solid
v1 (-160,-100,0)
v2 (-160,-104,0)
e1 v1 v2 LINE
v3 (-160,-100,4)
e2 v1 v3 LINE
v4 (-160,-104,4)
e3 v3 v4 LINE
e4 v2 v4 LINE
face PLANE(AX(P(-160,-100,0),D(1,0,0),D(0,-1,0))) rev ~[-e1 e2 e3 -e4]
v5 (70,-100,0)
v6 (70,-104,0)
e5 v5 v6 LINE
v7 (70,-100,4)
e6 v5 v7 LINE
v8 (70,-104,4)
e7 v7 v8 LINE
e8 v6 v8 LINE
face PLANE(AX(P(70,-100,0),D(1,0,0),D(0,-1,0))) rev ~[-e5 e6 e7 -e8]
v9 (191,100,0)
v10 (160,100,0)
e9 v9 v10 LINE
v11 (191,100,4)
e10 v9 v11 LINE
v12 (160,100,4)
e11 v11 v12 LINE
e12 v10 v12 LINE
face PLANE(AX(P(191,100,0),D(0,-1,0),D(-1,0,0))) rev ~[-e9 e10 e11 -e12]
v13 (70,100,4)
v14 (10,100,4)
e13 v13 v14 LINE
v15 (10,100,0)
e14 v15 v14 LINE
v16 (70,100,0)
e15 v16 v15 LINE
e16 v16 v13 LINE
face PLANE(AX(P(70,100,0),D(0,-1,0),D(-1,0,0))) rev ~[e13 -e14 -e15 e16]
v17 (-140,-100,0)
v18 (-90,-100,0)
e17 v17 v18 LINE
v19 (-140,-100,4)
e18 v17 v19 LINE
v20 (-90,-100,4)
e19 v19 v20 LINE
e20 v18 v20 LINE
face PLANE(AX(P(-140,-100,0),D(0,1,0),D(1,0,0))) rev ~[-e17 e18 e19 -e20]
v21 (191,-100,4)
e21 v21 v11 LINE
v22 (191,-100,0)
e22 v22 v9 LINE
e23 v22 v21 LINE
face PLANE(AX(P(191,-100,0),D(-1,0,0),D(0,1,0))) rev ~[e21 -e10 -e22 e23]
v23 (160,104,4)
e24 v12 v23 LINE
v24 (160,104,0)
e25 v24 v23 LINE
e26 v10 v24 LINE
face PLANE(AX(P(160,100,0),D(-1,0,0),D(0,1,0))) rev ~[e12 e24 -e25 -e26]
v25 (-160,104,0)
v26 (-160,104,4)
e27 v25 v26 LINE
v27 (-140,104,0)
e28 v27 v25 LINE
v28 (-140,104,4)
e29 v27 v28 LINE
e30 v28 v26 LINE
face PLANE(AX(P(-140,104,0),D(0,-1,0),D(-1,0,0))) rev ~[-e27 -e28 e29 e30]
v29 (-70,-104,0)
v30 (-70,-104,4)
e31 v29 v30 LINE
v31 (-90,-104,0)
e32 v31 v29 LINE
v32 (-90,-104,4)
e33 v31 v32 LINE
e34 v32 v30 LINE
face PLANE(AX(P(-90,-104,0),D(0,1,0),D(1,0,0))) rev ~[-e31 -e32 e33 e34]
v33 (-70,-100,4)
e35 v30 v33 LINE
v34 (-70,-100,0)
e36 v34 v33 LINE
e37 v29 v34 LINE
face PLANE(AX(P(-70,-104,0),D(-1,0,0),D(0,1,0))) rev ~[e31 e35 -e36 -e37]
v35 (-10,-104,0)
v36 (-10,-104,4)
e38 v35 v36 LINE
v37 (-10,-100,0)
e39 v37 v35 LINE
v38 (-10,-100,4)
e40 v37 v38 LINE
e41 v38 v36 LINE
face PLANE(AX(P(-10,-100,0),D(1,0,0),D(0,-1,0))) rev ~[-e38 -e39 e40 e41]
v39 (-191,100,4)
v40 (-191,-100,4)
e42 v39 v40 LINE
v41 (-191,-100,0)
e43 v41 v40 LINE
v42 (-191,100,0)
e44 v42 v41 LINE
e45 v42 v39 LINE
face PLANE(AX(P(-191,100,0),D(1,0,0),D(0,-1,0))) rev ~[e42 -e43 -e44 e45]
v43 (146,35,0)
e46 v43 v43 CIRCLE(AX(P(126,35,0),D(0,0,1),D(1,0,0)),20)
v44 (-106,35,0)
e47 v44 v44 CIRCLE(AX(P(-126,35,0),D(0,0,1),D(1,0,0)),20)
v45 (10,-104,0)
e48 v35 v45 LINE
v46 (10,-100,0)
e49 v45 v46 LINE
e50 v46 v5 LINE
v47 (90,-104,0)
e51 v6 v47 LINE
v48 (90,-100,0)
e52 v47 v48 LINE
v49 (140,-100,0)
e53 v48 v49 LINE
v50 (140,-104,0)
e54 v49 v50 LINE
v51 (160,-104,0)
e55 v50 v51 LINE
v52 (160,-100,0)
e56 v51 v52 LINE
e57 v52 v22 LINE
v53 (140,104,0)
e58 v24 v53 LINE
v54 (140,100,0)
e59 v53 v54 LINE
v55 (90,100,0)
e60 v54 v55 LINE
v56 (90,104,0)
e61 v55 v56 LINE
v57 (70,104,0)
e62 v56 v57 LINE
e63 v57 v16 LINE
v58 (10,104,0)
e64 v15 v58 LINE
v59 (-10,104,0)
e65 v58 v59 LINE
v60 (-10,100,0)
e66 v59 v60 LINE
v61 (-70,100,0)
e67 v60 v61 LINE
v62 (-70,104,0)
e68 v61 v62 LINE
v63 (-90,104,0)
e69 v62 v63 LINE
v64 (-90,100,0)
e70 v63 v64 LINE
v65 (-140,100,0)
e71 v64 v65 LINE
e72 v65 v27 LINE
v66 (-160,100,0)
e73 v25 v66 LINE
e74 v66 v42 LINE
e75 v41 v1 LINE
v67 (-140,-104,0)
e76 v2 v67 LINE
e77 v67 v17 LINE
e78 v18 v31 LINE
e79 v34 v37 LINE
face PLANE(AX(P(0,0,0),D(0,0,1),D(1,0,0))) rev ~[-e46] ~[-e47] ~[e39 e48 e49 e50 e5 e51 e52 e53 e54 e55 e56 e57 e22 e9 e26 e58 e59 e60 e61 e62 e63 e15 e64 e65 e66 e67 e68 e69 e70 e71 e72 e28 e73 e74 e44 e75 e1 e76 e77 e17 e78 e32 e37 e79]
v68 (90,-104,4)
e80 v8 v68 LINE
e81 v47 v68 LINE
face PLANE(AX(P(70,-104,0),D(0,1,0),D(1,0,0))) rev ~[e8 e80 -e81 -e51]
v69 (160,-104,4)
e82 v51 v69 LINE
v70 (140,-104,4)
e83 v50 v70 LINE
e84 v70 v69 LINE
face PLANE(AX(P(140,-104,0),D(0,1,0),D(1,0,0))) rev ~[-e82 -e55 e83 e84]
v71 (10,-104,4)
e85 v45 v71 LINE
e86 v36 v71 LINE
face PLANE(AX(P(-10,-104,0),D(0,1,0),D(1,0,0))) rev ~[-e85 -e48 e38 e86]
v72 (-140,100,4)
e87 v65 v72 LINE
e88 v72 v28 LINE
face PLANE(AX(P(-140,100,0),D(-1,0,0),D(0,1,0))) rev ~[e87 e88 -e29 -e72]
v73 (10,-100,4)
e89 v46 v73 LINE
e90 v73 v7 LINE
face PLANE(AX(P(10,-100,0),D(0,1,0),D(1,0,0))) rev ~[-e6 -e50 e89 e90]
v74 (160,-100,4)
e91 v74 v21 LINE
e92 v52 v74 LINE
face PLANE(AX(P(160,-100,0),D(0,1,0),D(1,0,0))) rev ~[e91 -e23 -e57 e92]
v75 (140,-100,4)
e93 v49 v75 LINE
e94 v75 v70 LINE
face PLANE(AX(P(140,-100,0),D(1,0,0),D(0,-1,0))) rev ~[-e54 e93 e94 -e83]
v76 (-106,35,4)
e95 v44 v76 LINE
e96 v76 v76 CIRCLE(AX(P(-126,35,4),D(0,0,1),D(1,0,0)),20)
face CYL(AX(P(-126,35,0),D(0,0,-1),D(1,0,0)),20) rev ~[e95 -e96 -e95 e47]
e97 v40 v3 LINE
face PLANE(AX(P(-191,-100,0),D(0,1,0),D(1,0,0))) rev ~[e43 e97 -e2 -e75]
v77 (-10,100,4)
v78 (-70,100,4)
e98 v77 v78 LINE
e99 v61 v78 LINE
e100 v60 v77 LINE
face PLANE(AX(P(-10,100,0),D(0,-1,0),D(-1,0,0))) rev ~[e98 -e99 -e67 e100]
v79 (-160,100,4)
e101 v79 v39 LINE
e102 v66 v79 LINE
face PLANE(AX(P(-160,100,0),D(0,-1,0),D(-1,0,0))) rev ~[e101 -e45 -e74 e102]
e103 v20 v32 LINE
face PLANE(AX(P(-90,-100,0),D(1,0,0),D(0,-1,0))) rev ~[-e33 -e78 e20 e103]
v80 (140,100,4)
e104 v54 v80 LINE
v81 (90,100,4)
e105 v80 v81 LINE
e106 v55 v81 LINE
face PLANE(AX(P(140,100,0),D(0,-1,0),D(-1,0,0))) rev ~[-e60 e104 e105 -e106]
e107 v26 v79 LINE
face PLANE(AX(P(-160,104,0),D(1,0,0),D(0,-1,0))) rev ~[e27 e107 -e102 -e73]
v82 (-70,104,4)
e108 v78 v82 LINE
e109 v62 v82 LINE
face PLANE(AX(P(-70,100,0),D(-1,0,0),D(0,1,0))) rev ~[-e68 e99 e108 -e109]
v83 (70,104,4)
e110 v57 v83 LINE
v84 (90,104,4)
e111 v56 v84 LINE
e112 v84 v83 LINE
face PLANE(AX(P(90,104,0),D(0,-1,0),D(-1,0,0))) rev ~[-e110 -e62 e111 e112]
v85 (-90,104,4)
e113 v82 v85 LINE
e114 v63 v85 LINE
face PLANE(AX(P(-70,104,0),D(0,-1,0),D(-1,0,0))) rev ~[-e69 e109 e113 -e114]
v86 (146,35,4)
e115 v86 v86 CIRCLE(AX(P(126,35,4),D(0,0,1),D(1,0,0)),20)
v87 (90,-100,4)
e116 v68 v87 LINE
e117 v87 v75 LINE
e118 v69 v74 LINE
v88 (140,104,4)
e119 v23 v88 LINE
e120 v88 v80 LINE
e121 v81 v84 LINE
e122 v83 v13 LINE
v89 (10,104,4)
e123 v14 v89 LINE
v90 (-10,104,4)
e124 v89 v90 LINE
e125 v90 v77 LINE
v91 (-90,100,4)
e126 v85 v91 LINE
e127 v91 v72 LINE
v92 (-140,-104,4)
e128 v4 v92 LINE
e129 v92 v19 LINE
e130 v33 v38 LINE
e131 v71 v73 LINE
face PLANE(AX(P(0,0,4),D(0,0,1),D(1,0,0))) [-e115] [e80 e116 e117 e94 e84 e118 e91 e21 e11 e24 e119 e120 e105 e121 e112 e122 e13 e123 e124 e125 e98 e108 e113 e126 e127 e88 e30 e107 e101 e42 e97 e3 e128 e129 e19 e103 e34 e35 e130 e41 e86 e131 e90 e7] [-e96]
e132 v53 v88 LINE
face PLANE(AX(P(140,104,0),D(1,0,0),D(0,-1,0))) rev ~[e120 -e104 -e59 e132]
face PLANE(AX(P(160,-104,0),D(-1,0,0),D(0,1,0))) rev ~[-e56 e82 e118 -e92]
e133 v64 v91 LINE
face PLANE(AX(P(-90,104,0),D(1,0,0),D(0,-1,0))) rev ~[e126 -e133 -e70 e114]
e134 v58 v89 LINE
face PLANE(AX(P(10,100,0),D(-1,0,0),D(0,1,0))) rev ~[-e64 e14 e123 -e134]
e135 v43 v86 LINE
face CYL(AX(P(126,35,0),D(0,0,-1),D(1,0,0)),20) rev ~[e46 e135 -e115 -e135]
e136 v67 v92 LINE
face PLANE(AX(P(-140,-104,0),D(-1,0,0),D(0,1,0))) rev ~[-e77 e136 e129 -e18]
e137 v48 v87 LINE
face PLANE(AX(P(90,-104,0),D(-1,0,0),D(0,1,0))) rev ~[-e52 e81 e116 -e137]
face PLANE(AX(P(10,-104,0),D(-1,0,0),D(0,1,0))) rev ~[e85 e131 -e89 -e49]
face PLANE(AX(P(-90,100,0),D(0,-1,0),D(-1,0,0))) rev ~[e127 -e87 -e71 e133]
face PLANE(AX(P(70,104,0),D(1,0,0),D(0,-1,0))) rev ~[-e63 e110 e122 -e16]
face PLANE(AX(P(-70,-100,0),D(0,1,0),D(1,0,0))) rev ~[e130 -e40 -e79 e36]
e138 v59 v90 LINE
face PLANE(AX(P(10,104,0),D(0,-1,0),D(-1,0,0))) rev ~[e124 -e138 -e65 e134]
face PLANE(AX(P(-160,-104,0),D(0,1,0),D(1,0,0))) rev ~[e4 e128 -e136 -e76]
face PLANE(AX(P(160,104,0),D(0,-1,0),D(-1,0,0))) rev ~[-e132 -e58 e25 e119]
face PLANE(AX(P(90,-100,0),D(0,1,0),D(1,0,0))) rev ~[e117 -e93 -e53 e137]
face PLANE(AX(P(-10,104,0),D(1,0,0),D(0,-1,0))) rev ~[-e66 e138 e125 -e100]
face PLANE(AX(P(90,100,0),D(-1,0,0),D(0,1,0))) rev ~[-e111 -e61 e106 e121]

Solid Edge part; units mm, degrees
sketch "Sketch1" plane through (0, 0, 0) normal (0, 0, 1) x (1, 0, 0)
  line L0 (-160, 104) -> (-160, 100)
  line L1 (-160, 100) -> (-191, 100)
  line L2 (-191, 100) -> (-191, -100)
  line L3 (-191, -100) -> (-160, -100)
  line L4 (-160, -100) -> (-160, -104)
  line L5 (-160, -104) -> (-140, -104)
  line L6 (-140, -104) -> (-140, -100)
  line L7 (-140, -100) -> (-90, -100)
  line L8 (-90, -100) -> (-90, -104)
  line L9 (-90, -104) -> (-70, -104)
  line L10 (-70, -104) -> (-70, -100)
  line L11 (-70, -100) -> (-10, -100)
  line L12 (-10, -100) -> (-10, -104)
  line L13 (-10, -104) -> (10, -104)
  line L14 (10, -104) -> (10, -100)
  line L15 (10, -100) -> (70, -100)
  line L16 (70, -100) -> (70, -104)
  line L17 (70, -104) -> (90, -104)
  line L18 (90, -104) -> (90, -100)
  line L19 (90, -100) -> (140, -100)
  line L20 (140, -100) -> (140, -104)
  line L21 (140, -104) -> (160, -104)
  line L22 (160, -104) -> (160, -100)
  line L23 (160, -100) -> (191, -100)
  line L24 (191, -100) -> (191, 100)
  line L25 (191, 100) -> (160, 100)
  line L26 (160, 100) -> (160, 104)
  line L27 (160, 104) -> (140, 104)
  line L28 (140, 104) -> (140, 100)
  line L29 (140, 100) -> (90, 100)
  line L30 (90, 100) -> (90, 104)
  line L31 (90, 104) -> (70, 104)
  line L32 (70, 104) -> (70, 100)
  line L33 (70, 100) -> (10, 100)
  line L34 (10, 100) -> (10, 104)
  line L35 (10, 104) -> (-10, 104)
  line L36 (-10, 104) -> (-10, 100)
  line L37 (-10, 100) -> (-70, 100)
  line L38 (-70, 100) -> (-70, 104)
  line L39 (-70, 104) -> (-90, 104)
  line L40 (-90, 104) -> (-90, 100)
  line L41 (-90, 100) -> (-140, 100)
  line L42 (-140, 100) -> (-140, 104)
  line L43 (-140, 104) -> (-160, 104)
  circle A0 centre (126, 35) radius 20
  circle A1 centre (-126, 35) radius 20
extrude "Protrusion1" add sketch "Sketch1" along normal blind 4
